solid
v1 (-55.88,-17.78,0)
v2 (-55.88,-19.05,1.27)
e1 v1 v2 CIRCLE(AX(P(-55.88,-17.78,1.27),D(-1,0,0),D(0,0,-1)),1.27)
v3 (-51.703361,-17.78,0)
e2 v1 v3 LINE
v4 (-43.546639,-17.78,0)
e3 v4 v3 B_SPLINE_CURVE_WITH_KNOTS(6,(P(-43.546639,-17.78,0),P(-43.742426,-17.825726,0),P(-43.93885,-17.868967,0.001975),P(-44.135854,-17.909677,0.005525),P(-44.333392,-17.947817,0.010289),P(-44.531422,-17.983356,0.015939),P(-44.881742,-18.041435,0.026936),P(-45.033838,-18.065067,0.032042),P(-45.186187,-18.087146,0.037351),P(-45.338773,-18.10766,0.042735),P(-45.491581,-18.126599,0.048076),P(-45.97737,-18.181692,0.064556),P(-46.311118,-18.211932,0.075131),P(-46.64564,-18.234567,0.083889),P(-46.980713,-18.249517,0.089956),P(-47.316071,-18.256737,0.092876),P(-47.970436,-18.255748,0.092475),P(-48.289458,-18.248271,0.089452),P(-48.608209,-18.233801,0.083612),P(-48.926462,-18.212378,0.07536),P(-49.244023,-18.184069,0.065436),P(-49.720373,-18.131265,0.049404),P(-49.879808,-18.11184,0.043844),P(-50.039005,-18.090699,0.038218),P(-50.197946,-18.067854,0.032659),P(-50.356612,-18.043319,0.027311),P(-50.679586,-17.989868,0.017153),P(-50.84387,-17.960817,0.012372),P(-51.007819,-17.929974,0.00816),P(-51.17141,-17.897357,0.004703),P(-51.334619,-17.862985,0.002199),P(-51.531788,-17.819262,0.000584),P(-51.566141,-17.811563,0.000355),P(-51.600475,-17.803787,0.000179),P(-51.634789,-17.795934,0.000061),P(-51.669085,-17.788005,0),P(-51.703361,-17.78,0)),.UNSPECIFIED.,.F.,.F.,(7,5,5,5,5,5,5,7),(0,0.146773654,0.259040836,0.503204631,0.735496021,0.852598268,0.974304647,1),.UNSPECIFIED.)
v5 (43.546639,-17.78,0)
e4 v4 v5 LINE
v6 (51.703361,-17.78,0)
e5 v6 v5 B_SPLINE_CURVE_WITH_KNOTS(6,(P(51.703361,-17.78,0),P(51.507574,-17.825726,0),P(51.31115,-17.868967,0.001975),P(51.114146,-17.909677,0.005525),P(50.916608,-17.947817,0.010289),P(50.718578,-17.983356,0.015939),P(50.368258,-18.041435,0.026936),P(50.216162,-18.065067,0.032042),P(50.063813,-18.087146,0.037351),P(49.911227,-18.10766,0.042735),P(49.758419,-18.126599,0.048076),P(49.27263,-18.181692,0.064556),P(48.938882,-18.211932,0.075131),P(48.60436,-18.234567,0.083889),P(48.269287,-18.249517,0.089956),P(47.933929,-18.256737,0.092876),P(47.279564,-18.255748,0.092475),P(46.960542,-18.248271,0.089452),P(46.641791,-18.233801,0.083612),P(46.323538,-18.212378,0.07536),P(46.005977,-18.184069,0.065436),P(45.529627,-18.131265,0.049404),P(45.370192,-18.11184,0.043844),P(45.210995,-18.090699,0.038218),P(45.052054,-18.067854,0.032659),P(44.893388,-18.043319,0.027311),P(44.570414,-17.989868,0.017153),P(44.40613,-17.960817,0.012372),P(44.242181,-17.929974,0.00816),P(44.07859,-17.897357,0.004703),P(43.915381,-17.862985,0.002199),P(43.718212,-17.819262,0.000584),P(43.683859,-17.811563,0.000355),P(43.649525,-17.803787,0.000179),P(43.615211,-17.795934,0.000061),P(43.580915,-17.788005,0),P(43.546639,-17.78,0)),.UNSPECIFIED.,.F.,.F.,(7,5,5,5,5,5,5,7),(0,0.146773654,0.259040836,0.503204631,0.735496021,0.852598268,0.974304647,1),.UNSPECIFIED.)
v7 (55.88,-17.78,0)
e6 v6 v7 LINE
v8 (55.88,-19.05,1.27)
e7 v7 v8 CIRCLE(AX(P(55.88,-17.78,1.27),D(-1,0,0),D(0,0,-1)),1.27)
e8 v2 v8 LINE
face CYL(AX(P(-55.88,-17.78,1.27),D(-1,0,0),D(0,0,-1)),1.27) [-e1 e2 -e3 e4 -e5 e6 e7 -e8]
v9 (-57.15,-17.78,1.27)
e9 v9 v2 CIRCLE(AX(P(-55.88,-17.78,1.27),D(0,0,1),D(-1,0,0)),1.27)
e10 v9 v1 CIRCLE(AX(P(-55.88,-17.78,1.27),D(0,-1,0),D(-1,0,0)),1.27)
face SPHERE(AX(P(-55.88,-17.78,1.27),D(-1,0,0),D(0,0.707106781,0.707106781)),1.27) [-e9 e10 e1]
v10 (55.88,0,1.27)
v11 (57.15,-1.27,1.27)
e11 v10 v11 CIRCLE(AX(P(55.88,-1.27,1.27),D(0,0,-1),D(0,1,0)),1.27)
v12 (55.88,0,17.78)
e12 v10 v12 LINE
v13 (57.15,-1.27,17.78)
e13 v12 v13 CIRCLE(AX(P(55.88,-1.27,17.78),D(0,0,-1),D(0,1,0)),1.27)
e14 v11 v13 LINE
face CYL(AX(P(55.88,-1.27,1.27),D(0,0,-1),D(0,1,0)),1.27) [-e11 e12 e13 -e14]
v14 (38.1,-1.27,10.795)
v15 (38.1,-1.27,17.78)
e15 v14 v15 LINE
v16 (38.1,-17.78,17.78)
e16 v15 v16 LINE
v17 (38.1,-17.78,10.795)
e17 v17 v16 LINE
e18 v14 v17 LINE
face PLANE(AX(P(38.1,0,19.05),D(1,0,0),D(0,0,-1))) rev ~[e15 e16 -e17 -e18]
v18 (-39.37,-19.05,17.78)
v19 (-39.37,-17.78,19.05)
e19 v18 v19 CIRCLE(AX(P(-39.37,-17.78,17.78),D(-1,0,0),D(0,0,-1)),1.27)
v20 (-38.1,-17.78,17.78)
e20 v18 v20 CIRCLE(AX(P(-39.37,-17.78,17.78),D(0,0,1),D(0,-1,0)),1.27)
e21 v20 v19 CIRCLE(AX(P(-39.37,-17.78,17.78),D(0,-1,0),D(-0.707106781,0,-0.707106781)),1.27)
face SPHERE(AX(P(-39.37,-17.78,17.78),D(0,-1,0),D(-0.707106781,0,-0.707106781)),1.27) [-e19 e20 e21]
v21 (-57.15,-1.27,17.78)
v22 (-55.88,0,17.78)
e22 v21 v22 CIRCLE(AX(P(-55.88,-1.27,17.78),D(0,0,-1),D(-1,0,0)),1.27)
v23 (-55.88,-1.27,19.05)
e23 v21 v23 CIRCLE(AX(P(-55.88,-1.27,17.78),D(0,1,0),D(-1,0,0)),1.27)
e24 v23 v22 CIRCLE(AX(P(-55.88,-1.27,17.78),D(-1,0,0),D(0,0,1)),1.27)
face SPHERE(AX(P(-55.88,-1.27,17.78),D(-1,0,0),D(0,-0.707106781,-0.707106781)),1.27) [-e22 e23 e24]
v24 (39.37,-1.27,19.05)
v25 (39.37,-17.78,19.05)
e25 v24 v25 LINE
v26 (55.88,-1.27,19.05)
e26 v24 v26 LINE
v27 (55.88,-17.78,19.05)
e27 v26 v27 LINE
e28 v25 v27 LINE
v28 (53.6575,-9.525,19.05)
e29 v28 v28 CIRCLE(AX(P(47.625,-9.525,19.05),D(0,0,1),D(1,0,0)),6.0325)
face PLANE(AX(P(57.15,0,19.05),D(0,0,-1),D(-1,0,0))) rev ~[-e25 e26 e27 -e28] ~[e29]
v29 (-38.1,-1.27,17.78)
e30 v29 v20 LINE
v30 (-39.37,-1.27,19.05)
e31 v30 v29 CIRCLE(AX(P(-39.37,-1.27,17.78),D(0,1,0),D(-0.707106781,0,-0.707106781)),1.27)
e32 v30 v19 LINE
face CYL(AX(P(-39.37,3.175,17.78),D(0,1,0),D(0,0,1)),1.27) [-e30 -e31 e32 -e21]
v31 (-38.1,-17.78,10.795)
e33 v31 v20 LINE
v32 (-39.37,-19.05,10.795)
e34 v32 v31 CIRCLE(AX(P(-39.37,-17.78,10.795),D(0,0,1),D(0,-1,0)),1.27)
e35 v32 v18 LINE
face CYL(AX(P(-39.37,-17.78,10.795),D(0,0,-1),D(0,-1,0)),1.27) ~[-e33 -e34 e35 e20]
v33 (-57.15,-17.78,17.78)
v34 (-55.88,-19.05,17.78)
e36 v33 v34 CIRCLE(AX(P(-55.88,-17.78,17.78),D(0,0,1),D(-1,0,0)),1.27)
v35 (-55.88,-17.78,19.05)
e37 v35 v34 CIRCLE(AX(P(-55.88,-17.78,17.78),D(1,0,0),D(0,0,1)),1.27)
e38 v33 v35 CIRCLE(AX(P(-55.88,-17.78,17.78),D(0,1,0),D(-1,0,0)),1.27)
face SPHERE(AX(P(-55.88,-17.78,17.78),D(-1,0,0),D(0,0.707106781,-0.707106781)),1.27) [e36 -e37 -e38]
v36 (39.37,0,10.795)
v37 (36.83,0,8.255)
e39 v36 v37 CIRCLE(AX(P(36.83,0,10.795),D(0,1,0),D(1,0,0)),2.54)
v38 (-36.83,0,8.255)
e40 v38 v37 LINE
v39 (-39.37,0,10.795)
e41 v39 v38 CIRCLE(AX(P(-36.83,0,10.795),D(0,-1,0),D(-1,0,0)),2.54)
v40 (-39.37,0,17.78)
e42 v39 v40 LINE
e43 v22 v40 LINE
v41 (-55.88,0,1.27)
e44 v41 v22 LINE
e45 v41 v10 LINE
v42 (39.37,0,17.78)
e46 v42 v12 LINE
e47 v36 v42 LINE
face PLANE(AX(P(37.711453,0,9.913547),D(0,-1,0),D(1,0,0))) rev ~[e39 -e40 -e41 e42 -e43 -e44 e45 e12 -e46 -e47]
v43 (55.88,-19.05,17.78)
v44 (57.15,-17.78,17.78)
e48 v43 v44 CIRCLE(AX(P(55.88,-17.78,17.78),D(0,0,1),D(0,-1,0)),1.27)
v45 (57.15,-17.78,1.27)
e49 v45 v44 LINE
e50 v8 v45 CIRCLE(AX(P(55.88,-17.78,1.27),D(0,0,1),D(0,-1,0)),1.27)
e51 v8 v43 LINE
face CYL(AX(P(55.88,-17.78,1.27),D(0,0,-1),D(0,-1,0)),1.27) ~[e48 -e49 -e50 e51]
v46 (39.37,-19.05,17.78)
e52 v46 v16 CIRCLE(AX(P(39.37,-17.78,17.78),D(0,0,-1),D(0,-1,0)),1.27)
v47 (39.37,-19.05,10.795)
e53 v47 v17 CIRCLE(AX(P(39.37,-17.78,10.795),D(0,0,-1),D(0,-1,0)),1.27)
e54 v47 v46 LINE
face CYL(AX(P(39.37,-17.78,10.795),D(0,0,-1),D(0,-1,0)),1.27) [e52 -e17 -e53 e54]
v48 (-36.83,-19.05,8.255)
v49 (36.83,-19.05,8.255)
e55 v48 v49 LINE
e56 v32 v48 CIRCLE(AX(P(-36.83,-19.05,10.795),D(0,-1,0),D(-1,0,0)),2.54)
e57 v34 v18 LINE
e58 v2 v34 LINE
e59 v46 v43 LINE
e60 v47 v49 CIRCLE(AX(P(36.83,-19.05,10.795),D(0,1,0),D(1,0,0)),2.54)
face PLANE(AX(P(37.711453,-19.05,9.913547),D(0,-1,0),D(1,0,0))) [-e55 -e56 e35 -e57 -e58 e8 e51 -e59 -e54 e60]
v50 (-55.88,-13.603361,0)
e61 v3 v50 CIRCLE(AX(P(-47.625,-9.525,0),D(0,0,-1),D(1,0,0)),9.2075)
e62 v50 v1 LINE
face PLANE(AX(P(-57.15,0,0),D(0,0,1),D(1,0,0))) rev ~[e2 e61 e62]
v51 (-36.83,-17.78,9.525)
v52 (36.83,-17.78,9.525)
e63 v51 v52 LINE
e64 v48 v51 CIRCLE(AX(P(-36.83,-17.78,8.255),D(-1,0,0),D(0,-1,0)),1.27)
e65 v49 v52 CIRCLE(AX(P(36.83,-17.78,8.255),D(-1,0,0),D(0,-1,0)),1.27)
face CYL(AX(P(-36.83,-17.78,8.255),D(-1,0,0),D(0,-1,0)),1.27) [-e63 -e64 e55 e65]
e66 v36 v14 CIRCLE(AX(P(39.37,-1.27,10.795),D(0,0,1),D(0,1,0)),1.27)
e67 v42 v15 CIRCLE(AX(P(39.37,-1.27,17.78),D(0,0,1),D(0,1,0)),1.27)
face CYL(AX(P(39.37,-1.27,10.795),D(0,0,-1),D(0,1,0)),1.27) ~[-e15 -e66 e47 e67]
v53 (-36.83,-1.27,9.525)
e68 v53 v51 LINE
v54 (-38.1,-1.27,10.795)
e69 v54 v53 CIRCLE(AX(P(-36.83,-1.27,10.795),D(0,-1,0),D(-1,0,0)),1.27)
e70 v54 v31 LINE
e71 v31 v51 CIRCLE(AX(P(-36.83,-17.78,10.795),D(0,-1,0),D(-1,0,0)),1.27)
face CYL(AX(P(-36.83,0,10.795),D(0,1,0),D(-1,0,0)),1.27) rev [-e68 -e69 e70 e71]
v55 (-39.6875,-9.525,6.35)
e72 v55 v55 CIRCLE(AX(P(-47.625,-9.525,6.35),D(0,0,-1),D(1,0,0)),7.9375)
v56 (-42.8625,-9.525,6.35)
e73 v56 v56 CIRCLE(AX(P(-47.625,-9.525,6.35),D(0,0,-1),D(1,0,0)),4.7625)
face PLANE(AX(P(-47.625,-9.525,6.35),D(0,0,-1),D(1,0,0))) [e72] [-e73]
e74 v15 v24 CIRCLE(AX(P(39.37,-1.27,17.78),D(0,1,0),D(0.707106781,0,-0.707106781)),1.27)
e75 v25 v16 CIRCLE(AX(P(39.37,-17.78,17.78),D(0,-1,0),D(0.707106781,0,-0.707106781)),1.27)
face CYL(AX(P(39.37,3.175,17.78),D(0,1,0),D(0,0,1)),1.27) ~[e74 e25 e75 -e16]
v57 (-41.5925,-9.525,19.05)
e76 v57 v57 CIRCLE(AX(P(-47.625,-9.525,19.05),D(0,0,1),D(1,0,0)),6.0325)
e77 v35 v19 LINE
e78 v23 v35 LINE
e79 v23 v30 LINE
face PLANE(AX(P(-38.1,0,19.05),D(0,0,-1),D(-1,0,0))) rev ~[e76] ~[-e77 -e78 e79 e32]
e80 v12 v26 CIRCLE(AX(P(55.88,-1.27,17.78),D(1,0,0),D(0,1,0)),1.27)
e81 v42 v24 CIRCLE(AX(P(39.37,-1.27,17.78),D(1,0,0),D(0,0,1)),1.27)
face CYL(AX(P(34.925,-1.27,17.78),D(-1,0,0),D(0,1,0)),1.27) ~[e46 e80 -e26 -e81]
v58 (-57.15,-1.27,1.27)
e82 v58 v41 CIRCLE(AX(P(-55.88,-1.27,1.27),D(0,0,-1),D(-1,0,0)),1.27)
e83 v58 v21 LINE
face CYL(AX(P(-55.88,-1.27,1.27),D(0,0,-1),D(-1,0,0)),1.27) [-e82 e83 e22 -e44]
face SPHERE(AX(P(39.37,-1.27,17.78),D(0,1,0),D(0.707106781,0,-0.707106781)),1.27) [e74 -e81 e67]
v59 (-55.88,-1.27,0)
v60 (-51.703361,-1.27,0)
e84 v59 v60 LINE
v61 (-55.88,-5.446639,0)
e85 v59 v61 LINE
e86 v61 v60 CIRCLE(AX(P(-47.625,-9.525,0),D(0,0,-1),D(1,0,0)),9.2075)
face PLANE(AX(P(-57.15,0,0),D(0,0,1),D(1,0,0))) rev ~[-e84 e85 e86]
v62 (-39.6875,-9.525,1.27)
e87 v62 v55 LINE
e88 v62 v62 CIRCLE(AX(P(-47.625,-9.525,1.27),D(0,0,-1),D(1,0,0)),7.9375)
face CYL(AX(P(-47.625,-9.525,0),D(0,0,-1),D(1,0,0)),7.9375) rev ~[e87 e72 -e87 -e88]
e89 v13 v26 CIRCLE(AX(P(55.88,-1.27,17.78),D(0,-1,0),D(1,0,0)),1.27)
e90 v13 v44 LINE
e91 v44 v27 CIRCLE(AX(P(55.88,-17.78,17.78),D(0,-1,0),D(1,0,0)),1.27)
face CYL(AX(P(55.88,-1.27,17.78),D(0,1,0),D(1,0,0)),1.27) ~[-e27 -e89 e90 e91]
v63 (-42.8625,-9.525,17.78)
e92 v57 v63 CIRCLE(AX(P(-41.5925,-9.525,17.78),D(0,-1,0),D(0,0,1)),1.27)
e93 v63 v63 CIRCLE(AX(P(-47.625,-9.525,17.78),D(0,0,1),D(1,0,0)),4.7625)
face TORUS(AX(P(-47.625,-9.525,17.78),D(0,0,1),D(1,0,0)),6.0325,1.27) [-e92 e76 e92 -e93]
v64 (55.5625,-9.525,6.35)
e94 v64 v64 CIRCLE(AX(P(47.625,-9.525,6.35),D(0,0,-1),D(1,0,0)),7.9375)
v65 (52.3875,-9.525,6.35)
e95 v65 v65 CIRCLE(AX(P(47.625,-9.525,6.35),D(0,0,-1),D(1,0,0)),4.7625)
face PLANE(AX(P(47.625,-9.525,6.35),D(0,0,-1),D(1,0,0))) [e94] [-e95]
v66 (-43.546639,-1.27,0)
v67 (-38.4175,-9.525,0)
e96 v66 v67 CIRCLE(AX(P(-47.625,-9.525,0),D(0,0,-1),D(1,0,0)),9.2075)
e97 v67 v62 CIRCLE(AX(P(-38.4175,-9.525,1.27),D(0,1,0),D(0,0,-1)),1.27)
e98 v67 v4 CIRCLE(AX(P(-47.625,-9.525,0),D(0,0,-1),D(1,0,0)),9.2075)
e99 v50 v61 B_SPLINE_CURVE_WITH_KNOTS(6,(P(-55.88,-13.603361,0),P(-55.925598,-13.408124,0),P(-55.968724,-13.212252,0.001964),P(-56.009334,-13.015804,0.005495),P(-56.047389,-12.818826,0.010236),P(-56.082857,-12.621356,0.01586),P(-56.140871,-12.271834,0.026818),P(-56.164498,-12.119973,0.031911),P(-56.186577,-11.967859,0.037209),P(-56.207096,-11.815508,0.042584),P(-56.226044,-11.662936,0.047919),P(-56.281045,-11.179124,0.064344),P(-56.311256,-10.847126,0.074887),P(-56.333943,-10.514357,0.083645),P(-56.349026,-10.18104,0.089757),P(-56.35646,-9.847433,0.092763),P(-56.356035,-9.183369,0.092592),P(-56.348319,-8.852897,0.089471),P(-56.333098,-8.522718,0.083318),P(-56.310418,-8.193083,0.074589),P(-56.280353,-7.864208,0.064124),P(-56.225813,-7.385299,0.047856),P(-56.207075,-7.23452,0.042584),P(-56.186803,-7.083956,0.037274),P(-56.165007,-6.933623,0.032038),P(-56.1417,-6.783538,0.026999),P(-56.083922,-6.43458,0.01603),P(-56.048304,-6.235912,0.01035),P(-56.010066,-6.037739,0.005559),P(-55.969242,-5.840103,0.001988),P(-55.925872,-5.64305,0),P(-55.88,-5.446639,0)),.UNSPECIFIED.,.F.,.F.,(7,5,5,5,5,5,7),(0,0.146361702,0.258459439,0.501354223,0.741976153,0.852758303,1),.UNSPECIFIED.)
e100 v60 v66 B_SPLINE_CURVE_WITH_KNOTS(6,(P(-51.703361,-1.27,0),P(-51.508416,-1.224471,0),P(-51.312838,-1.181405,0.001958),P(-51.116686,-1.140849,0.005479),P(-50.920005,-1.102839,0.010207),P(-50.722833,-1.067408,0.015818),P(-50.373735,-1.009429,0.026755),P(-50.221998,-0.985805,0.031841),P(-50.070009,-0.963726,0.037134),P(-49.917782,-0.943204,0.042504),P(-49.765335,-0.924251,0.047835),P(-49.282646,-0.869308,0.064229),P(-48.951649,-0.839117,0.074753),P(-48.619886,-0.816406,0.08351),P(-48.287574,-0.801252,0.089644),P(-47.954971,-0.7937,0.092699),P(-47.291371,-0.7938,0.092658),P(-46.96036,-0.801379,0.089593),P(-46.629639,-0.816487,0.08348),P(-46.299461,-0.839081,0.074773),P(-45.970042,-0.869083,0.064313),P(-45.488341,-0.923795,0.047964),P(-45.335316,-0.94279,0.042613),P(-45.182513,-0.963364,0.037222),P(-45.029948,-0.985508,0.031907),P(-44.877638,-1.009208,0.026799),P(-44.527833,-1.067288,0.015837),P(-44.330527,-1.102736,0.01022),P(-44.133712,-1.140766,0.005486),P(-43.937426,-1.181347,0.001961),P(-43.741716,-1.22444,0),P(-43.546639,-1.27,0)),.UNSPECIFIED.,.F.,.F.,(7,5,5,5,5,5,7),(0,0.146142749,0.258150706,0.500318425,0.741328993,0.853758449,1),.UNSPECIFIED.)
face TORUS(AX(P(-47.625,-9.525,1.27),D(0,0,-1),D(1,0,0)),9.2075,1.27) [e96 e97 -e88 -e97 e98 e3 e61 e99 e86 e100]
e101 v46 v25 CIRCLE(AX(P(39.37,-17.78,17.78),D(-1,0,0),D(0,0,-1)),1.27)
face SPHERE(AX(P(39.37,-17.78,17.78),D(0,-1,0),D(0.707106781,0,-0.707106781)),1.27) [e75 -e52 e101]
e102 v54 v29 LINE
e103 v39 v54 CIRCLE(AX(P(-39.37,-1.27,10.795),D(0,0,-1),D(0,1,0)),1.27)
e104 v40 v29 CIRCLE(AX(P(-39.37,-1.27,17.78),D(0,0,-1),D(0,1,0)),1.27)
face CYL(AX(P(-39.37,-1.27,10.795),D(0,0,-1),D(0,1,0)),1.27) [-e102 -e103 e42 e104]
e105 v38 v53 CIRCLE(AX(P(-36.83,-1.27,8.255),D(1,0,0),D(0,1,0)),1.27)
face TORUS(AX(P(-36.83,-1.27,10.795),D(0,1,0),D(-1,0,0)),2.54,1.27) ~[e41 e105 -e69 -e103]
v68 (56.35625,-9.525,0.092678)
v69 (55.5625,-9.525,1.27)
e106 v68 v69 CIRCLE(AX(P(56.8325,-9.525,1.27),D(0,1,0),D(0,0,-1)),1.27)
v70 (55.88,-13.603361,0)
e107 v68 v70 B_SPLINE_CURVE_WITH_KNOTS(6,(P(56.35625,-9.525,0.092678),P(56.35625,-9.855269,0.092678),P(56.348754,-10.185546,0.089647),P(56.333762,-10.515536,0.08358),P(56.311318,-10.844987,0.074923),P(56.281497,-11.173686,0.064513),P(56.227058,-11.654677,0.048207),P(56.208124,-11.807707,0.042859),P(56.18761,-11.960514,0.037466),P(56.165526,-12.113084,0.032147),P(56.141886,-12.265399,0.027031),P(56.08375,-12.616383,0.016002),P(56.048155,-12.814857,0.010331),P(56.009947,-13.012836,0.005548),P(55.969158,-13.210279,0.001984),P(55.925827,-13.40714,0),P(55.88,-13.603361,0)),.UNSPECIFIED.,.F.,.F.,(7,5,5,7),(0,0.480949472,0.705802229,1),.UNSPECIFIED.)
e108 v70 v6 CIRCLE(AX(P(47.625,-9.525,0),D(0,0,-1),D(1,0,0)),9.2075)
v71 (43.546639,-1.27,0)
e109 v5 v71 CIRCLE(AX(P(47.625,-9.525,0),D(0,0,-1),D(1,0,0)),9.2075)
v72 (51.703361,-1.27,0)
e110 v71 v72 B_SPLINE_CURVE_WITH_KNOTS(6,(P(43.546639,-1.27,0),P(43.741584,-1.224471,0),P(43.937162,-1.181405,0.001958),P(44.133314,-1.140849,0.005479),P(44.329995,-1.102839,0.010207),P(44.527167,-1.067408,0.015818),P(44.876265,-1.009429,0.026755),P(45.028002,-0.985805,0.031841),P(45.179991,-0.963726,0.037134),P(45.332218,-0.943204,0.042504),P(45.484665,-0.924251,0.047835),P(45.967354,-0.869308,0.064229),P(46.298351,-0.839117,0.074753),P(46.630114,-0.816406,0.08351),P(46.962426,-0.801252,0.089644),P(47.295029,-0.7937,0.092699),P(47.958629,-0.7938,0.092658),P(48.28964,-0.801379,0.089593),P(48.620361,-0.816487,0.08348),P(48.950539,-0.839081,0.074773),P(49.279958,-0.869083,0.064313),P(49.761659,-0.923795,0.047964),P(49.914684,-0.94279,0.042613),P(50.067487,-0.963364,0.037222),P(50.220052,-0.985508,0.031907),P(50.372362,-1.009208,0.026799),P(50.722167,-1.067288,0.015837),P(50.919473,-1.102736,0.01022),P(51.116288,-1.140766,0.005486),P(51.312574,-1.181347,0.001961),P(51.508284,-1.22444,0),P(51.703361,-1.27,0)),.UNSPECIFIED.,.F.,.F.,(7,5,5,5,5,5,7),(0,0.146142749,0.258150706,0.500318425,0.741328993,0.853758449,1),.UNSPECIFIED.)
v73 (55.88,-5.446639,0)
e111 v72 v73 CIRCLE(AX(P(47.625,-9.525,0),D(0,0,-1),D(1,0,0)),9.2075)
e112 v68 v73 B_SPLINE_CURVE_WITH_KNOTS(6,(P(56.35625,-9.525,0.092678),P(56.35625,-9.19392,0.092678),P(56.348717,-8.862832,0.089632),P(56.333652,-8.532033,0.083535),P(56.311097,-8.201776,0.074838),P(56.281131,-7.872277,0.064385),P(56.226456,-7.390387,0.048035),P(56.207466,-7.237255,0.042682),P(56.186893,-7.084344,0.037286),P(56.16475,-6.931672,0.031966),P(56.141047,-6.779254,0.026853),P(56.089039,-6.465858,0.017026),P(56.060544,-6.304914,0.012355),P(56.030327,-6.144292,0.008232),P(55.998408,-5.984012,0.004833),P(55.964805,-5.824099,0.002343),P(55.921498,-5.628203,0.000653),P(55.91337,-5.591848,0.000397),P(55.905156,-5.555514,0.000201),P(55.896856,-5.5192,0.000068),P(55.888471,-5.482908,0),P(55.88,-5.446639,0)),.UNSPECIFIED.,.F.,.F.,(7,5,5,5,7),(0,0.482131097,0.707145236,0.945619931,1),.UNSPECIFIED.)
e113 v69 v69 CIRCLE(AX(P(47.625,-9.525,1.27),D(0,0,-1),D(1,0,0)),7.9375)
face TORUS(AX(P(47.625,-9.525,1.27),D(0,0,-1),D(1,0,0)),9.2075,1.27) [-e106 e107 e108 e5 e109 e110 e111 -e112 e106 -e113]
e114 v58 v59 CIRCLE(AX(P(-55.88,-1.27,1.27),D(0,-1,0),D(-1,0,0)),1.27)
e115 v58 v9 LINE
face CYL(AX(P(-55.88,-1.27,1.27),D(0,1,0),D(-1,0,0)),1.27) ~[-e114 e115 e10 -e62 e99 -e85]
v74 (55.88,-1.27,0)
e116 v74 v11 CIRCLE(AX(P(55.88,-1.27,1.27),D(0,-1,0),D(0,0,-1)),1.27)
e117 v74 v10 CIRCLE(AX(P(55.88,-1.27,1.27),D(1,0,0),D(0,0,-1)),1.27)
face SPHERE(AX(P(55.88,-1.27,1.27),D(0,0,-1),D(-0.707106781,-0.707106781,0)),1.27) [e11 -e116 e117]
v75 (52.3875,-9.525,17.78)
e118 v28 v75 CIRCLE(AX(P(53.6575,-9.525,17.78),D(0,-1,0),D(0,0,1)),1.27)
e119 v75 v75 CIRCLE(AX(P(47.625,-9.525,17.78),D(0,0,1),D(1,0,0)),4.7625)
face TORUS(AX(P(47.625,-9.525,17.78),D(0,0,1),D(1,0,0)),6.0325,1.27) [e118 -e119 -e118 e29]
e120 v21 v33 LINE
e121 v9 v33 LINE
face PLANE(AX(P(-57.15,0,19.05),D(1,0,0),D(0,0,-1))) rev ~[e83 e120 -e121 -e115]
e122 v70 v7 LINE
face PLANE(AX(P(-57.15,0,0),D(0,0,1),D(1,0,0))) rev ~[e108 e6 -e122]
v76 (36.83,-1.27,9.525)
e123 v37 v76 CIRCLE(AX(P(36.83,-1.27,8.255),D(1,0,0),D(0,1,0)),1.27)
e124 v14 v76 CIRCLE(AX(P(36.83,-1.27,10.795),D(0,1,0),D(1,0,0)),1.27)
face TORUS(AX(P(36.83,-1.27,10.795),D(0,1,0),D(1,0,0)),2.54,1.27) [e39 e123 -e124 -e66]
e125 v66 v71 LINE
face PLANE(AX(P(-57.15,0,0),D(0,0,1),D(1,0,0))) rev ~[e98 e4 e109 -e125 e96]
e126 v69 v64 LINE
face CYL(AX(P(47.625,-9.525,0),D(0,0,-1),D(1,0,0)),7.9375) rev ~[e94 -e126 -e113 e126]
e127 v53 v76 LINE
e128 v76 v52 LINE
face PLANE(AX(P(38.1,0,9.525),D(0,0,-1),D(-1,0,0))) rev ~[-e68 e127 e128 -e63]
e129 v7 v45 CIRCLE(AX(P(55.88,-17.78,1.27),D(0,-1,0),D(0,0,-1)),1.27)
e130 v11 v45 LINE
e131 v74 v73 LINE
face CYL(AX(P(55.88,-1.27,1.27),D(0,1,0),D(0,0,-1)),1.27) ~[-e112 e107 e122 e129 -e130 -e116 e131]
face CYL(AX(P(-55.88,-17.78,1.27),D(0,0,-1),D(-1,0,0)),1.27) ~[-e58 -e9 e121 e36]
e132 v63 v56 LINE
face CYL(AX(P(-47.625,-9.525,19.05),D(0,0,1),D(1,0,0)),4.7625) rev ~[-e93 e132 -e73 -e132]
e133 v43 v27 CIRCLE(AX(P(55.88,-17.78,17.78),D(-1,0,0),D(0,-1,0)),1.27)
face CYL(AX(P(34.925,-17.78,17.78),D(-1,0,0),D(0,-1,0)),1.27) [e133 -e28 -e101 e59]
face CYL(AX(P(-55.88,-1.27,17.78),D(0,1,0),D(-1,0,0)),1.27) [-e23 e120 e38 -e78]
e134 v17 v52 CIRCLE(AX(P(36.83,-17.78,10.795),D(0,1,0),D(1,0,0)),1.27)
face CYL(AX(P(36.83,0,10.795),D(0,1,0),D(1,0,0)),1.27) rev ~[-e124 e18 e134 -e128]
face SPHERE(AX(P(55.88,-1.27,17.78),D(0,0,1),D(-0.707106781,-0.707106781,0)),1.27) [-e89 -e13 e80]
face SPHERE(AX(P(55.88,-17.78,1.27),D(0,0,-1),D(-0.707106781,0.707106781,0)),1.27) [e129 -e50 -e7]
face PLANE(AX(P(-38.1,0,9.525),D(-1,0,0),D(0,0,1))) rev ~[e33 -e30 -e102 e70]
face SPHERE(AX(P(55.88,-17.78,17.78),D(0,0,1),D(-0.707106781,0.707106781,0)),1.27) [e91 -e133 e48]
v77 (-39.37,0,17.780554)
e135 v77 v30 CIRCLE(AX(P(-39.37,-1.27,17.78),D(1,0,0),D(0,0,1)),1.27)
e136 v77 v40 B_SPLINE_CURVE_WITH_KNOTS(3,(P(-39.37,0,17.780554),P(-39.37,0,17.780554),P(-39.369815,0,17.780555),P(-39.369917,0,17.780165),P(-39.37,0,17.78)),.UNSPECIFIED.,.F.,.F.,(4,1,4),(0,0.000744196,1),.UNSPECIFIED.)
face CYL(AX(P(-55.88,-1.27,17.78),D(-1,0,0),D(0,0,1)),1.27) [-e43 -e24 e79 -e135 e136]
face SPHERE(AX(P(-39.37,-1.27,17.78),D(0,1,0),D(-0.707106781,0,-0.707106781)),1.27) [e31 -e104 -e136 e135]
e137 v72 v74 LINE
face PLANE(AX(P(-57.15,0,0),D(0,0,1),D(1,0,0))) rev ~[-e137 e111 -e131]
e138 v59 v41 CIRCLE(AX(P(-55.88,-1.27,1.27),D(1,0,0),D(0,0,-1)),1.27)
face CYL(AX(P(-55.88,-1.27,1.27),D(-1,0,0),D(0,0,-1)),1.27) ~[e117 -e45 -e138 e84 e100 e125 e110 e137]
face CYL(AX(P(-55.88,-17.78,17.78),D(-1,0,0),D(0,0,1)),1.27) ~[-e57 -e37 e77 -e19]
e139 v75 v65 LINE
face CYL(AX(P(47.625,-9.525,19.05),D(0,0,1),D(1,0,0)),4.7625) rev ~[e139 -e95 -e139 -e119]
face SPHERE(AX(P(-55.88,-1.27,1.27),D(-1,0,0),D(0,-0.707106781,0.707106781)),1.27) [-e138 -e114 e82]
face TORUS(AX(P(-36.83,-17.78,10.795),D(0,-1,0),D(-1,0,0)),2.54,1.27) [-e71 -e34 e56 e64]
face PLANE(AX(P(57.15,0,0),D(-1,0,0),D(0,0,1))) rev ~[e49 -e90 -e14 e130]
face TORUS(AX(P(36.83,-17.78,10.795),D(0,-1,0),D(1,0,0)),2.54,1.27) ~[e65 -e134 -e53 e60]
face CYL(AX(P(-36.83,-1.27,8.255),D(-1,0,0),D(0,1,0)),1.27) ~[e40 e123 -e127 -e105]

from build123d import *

# Parameters (mm, degrees)
F1_DEPTH      = 19.05
F2_R          = 4.7625
F3_DEPTH      = 19.051
F4_R          = 7.9375
F4_R_2        = 4.7625
F5_DEPTH      = 6.35
F6_T1_DEPTH   = 19.05
F6_T3_DEPTH   = 16.51
F6_T5_DEPTH   = 111.76
F6_T7_DEPTH   = 20.955
F6_T9_DEPTH   = 20.955
F6_T11_DEPTH  = 16.51
F6_T13_DEPTH  = 25.4
F6_S17_W      = 1.27
F6_S17_H      = 1.27
F6_T18_DEPTH  = 1.27
F6_S23_W      = 1.27
F6_S23_H      = 1.27
F6_T24_DEPTH  = 1.27
F6_S29_W      = 1.27
F6_S29_H      = 1.27
F6_T30_DEPTH  = 1.27
F6_S35_W      = 1.27
F6_S35_H      = 1.27
F6_T36_DEPTH  = 1.27
F6_S41_W      = 1.27
F6_S41_H      = 1.27
F6_T42_DEPTH  = 1.27
F6_S47_W      = 1.27
F6_S47_H      = 1.27
F6_T48_DEPTH  = 1.27
F6_S53_W      = 1.27
F6_S53_H      = 1.27
F6_T54_DEPTH  = 1.27
F6_S59_W      = 1.27
F6_S59_H      = 1.27
F6_T60_DEPTH  = 1.27
F6_T71_DEPTH  = 6.985
F6_T73_DEPTH  = 73.66
F6_S77_W      = 1.27
F6_S77_H      = 1.27
F6_T78_DEPTH  = 1.27
F6_S83_W      = 1.27
F6_S83_H      = 1.27
F6_T84_DEPTH  = 1.27
F6_S89_W      = 1.27
F6_S89_H      = 1.27
F6_T90_DEPTH  = 1.27
F6_S95_W      = 1.27
F6_S95_H      = 1.27
F6_T96_DEPTH  = 1.27
F6_T100_ANGLE = 90
F6_T102_ANGLE = 90
F6_T104_ANGLE = 90
F6_T106_ANGLE = 90


# Not quite as in the source:
# - a fillet or chamfer that OpenCascade refuses, or shapes differently, is made with other operations: its cross-section is extruded or revolved along the edge and cut away or added


with BuildPart() as f1:
    # F0 (on Front) → F1 (new body)
    with BuildSketch(Plane.XZ):
        Polygon((-57.15, 19.05), (-57.15, 0), (0, 0), (57.15, 0), (57.15, 19.05), (38.1, 19.05), (38.1, 9.525), (-38.1, 9.525), (-38.1, 19.05), align=None)
    extrude(amount=F1_DEPTH)

    # F2 (on face) → F3 (cut, through all)
    with BuildSketch(Plane.XY.offset(19.05)):
        with Locations((-47.625, -9.525)):
            Circle(F2_R)
        with Locations((47.625, -9.525)):
            Circle(F2_R)
    extrude(amount=-F3_DEPTH, mode=Mode.SUBTRACT)

    # F4 (on face) → F5 (cut)
    with BuildSketch(Plane(origin=(0, 0, 0), x_dir=(1, 0, 0), z_dir=(0, 0, -1))):
        with Locations((-47.625, 9.525)):
            Circle(F4_R)
        with Locations((-47.625, 9.525)):
            Circle(F4_R_2, mode=Mode.SUBTRACT)
        with Locations((47.625, 9.525)):
            Circle(F4_R)
        with Locations((47.625, 9.525)):
            Circle(F4_R_2, mode=Mode.SUBTRACT)
    extrude(amount=-F5_DEPTH, mode=Mode.SUBTRACT)

    # F6: fillet of radius 1.27 on 28 edges, made by hand

    # F6_s2 → F6_t1 (join)
    with BuildSketch(Plane.XZ):
        with BuildLine():
            ThreePointArc((38.1, 10.795), (37.7280256121, 9.8969743879), (36.83, 9.525))
            Line((36.83, 9.525), (38.1, 9.525))
            Line((38.1, 9.525), (38.1, 10.795))
        make_face()
        with BuildLine():
            ThreePointArc((-38.1, 10.795), (-37.7280256121, 9.8969743879), (-36.83, 9.525))
            Line((-36.83, 9.525), (-38.1, 9.525))
            Line((-38.1, 9.525), (-38.1, 10.795))
        make_face()
    extrude(amount=F6_T1_DEPTH)

    # F6_s4 → F6_t3 (cut)
    with BuildSketch(Plane.XY.offset(1.27)):
        with BuildLine():
            ThreePointArc((-57.15, -17.78), (-56.7780256121, -18.6780256121), (-55.88, -19.05))
            Line((-55.88, -19.05), (-57.15, -19.05))
            Line((-57.15, -19.05), (-57.15, -17.78))
        make_face()
        with BuildLine():
            ThreePointArc((55.88, -19.05), (56.7780256121, -18.6780256121), (57.15, -17.78))
            Line((57.15, -17.78), (57.15, -19.05))
            Line((57.15, -19.05), (55.88, -19.05))
        make_face()
        with BuildLine():
            ThreePointArc((-57.15, -1.27), (-56.7780256121, -0.3719743879), (-55.88, 0))
            Line((-55.88, 0), (-57.15, 0))
            Line((-57.15, 0), (-57.15, -1.27))
        make_face()
        with BuildLine():
            ThreePointArc((55.88, 0), (56.7780256121, -0.3719743879), (57.15, -1.27))
            Line((57.15, -1.27), (57.15, 0))
            Line((57.15, 0), (55.88, 0))
        make_face()
    extrude(amount=F6_T3_DEPTH, mode=Mode.SUBTRACT)

    # F6_s6 → F6_t5 (cut)
    with BuildSketch(Plane.YZ.offset(-55.88)):
        with BuildLine():
            ThreePointArc((-17.78, 0), (-18.6780256121, 0.3719743879), (-19.05, 1.27))
            Line((-19.05, 1.27), (-19.05, 0))
            Line((-19.05, 0), (-17.78, 0))
        make_face()
        with BuildLine():
            ThreePointArc((-1.27, 0), (-0.3719743879, 0.3719743879), (0, 1.27))
            Line((0, 1.27), (0, 0))
            Line((0, 0), (-1.27, 0))
        make_face()
    extrude(amount=F6_T5_DEPTH, mode=Mode.SUBTRACT)

    # F6_s8 → F6_t7 (cut)
    with BuildSketch(Plane.YZ.offset(34.925)):
        with BuildLine():
            ThreePointArc((-19.05, 17.78), (-18.6780256121, 18.6780256121), (-17.78, 19.05))
            Line((-17.78, 19.05), (-19.05, 19.05))
            Line((-19.05, 19.05), (-19.05, 17.78))
        make_face()
        with BuildLine():
            ThreePointArc((0, 17.78), (-0.3719743879, 18.6780256121), (-1.27, 19.05))
            Line((-1.27, 19.05), (0, 19.05))
            Line((0, 19.05), (0, 17.78))
        make_face()
    extrude(amount=F6_T7_DEPTH, mode=Mode.SUBTRACT)

    # F6_s10 → F6_t9 (cut)
    with BuildSketch(Plane.YZ.offset(-55.88)):
        with BuildLine():
            ThreePointArc((-17.78, 19.05), (-18.6780256121, 18.6780256121), (-19.05, 17.78))
            Line((-19.05, 17.78), (-19.05, 19.05))
            Line((-19.05, 19.05), (-17.78, 19.05))
        make_face()
        with BuildLine():
            ThreePointArc((-1.27, 19.05), (-0.3719743879, 18.6780256121), (0, 17.78))
            Line((0, 17.78), (0, 19.05))
            Line((0, 19.05), (-1.27, 19.05))
        make_face()
    extrude(amount=F6_T9_DEPTH, mode=Mode.SUBTRACT)

    # F6_s12 → F6_t11 (cut)
    with BuildSketch(Plane.XZ.offset(1.27)):
        with BuildLine():
            ThreePointArc((57.15, 17.78), (56.7780256121, 18.6780256121), (55.88, 19.05))
            Line((55.88, 19.05), (57.15, 19.05))
            Line((57.15, 19.05), (57.15, 17.78))
        make_face()
        with BuildLine():
            ThreePointArc((-57.15, 17.78), (-56.7780256121, 18.6780256121), (-55.88, 19.05))
            Line((-55.88, 19.05), (-57.15, 19.05))
            Line((-57.15, 19.05), (-57.15, 17.78))
        make_face()
        with BuildLine():
            ThreePointArc((-57.15, 1.27), (-56.7780256121, 0.3719743879), (-55.88, 0))
            Line((-55.88, 0), (-57.15, 0))
            Line((-57.15, 0), (-57.15, 1.27))
        make_face()
        with BuildLine():
            ThreePointArc((55.88, 0), (56.7780256121, 0.3719743879), (57.15, 1.27))
            Line((57.15, 1.27), (57.15, 0))
            Line((57.15, 0), (55.88, 0))
        make_face()
    extrude(amount=F6_T11_DEPTH, mode=Mode.SUBTRACT)

    # F6_s14 → F6_t13 (cut)
    with BuildSketch(Plane.XZ.offset(-3.175)):
        with BuildLine():
            ThreePointArc((39.37, 19.05), (38.4719743879, 18.6780256121), (38.1, 17.78))
            Line((38.1, 17.78), (38.1, 19.05))
            Line((38.1, 19.05), (39.37, 19.05))
        make_face()
        with BuildLine():
            ThreePointArc((-39.37, 19.05), (-38.4719743879, 18.6780256121), (-38.1, 17.78))
            Line((-38.1, 17.78), (-38.1, 19.05))
            Line((-38.1, 19.05), (-39.37, 19.05))
        make_face()
    extrude(amount=F6_T13_DEPTH, mode=Mode.SUBTRACT)


with BuildPart() as f6_tool16:
    # F6_s17 → F6_t18 (new body)
    with BuildSketch(Plane.YZ.offset(-55.88)):
        with Locations((-18.415, 18.415)):
            Rectangle(F6_S17_W, F6_S17_H)
    extrude(amount=-F6_T18_DEPTH)

    # F6_s19 → F6_t20 (revolve, cut)
    with BuildSketch(Plane(origin=(-55.88, -17.78, 17.78), x_dir=(0, 0.7071067812, -0.7071067812), z_dir=(0, 0.7071067812, 0.7071067812))):
        with BuildLine():
            ThreePointArc((0, -1.27), (1.27, 0), (0, 1.27))
            Line((0, 1.27), (0, -1.27))
        make_face()
    revolve(axis=Axis((-55.88, -17.78, 17.78), (-1, 0, 0)), mode=Mode.SUBTRACT)


with BuildPart() as f1_1:
    add(f1.part)

    # F6_t15: cut F6_tool16
    add(f6_tool16.part, mode=Mode.SUBTRACT)


with BuildPart() as f6_tool22:
    # F6_s23 → F6_t24 (new body)
    with BuildSketch(Plane.YZ.offset(-55.88)):
        with Locations((-18.415, 0.635)):
            Rectangle(F6_S23_W, F6_S23_H)
    extrude(amount=-F6_T24_DEPTH)

    # F6_s25 → F6_t26 (revolve, cut)
    with BuildSketch(Plane(origin=(-55.88, -17.78, 1.27), x_dir=(0, 0.7071067812, 0.7071067812), z_dir=(0, -0.7071067812, 0.7071067812))):
        with BuildLine():
            ThreePointArc((0, -1.27), (1.27, 0), (0, 1.27))
            Line((0, 1.27), (0, -1.27))
        make_face()
    revolve(axis=Axis((-55.88, -17.78, 1.27), (-1, 0, 0)), mode=Mode.SUBTRACT)


with BuildPart() as f1_2:
    add(f1_1.part)

    # F6_t21: cut F6_tool22
    add(f6_tool22.part, mode=Mode.SUBTRACT)


with BuildPart() as f6_tool28:
    # F6_s29 → F6_t30 (new body)
    with BuildSketch(Plane.XY.offset(1.27)):
        with Locations((56.515, -18.415)):
            Rectangle(F6_S29_W, F6_S29_H)
    extrude(amount=-F6_T30_DEPTH)

    # F6_s31 → F6_t32 (revolve, cut)
    with BuildSketch(Plane(origin=(55.88, -17.78, 1.27), x_dir=(-0.7071067812, 0.7071067812, 0), z_dir=(-0.7071067812, -0.7071067812, 0))):
        with BuildLine():
            ThreePointArc((0, -1.27), (1.27, 0), (0, 1.27))
            Line((0, 1.27), (0, -1.27))
        make_face()
    revolve(axis=Axis((55.88, -17.78, 1.27), (0, 0, -1)), mode=Mode.SUBTRACT)


with BuildPart() as f1_3:
    add(f1_2.part)

    # F6_t27: cut F6_tool28
    add(f6_tool28.part, mode=Mode.SUBTRACT)


with BuildPart() as f6_tool34:
    # F6_s35 → F6_t36 (new body)
    with BuildSketch(Plane.XY.offset(17.78)):
        with Locations((56.515, -18.415)):
            Rectangle(F6_S35_W, F6_S35_H)
    extrude(amount=F6_T36_DEPTH)

    # F6_s37 → F6_t38 (revolve, cut)
    with BuildSketch(Plane(origin=(55.88, -17.78, 17.78), x_dir=(-0.7071067812, 0.7071067812, 0), z_dir=(0.7071067812, 0.7071067812, 0))):
        with BuildLine():
            ThreePointArc((0, -1.27), (1.27, 0), (0, 1.27))
            Line((0, 1.27), (0, -1.27))
        make_face()
    revolve(axis=Axis((55.88, -17.78, 17.78), (0, 0, 1)), mode=Mode.SUBTRACT)


with BuildPart() as f1_4:
    add(f1_3.part)

    # F6_t33: cut F6_tool34
    add(f6_tool34.part, mode=Mode.SUBTRACT)


with BuildPart() as f6_tool40:
    # F6_s41 → F6_t42 (new body)
    with BuildSketch(Plane.YZ.offset(-55.88)):
        with Locations((-0.635, 18.415)):
            Rectangle(F6_S41_W, F6_S41_H)
    extrude(amount=-F6_T42_DEPTH)

    # F6_s43 → F6_t44 (revolve, cut)
    with BuildSketch(Plane(origin=(-55.88, -1.27, 17.78), x_dir=(0, -0.7071067812, -0.7071067812), z_dir=(0, 0.7071067812, -0.7071067812))):
        with BuildLine():
            ThreePointArc((0, -1.27), (1.27, 0), (0, 1.27))
            Line((0, 1.27), (0, -1.27))
        make_face()
    revolve(axis=Axis((-55.88, -1.27, 17.78), (-1, 0, 0)), mode=Mode.SUBTRACT)


with BuildPart() as f1_5:
    add(f1_4.part)

    # F6_t39: cut F6_tool40
    add(f6_tool40.part, mode=Mode.SUBTRACT)


with BuildPart() as f6_tool46:
    # F6_s47 → F6_t48 (new body)
    with BuildSketch(Plane.YZ.offset(-55.88)):
        with Locations((-0.635, 0.635)):
            Rectangle(F6_S47_W, F6_S47_H)
    extrude(amount=-F6_T48_DEPTH)

    # F6_s49 → F6_t50 (revolve, cut)
    with BuildSketch(Plane(origin=(-55.88, -1.27, 1.27), x_dir=(0, -0.7071067812, 0.7071067812), z_dir=(0, -0.7071067812, -0.7071067812))):
        with BuildLine():
            ThreePointArc((0, -1.27), (1.27, 0), (0, 1.27))
            Line((0, 1.27), (0, -1.27))
        make_face()
    revolve(axis=Axis((-55.88, -1.27, 1.27), (-1, 0, 0)), mode=Mode.SUBTRACT)


with BuildPart() as f1_6:
    add(f1_5.part)

    # F6_t45: cut F6_tool46
    add(f6_tool46.part, mode=Mode.SUBTRACT)


with BuildPart() as f6_tool52:
    # F6_s53 → F6_t54 (new body)
    with BuildSketch(Plane.XY.offset(1.27)):
        with Locations((56.515, -0.635)):
            Rectangle(F6_S53_W, F6_S53_H)
    extrude(amount=-F6_T54_DEPTH)

    # F6_s55 → F6_t56 (revolve, cut)
    with BuildSketch(Plane(origin=(55.88, -1.27, 1.27), x_dir=(-0.7071067812, -0.7071067812, 0), z_dir=(0.7071067812, -0.7071067812, 0))):
        with BuildLine():
            ThreePointArc((0, -1.27), (1.27, 0), (0, 1.27))
            Line((0, 1.27), (0, -1.27))
        make_face()
    revolve(axis=Axis((55.88, -1.27, 1.27), (0, 0, -1)), mode=Mode.SUBTRACT)


with BuildPart() as f1_7:
    add(f1_6.part)

    # F6_t51: cut F6_tool52
    add(f6_tool52.part, mode=Mode.SUBTRACT)


with BuildPart() as f6_tool58:
    # F6_s59 → F6_t60 (new body)
    with BuildSketch(Plane.XY.offset(17.78)):
        with Locations((56.515, -0.635)):
            Rectangle(F6_S59_W, F6_S59_H)
    extrude(amount=F6_T60_DEPTH)

    # F6_s61 → F6_t62 (revolve, cut)
    with BuildSketch(Plane(origin=(55.88, -1.27, 17.78), x_dir=(-0.7071067812, -0.7071067812, 0), z_dir=(-0.7071067812, 0.7071067812, 0))):
        with BuildLine():
            ThreePointArc((0, -1.27), (1.27, 0), (0, 1.27))
            Line((0, 1.27), (0, -1.27))
        make_face()
    revolve(axis=Axis((55.88, -1.27, 17.78), (0, 0, 1)), mode=Mode.SUBTRACT)


with BuildPart() as f1_8:
    add(f1_7.part)

    # F6_t57: cut F6_tool58
    add(f6_tool58.part, mode=Mode.SUBTRACT)

    # F6_s63 → F6_t64 (revolve, cut)
    with BuildSketch(Plane.XZ.offset(9.525)):
        with BuildLine():
            ThreePointArc((53.6575, 19.05), (52.7594743879, 18.6780256121), (52.3875, 17.78))
            Line((52.3875, 17.78), (52.3875, 19.05))
            Line((52.3875, 19.05), (53.6575, 19.05))
        make_face()
    revolve(axis=Axis((47.625, -9.525, 19.05), (0, 0, 1)), mode=Mode.SUBTRACT)

    # F6_s65 → F6_t66 (revolve, cut)
    with BuildSketch(Plane.XZ.offset(9.525)):
        with BuildLine():
            ThreePointArc((-41.5925, 19.05), (-42.4905256121, 18.6780256121), (-42.8625, 17.78))
            Line((-42.8625, 17.78), (-42.8625, 19.05))
            Line((-42.8625, 19.05), (-41.5925, 19.05))
        make_face()
    revolve(axis=Axis((-47.625, -9.525, 19.05), (0, 0, 1)), mode=Mode.SUBTRACT)

    # F6_s67 → F6_t68 (revolve, cut)
    with BuildSketch(Plane.XZ.offset(9.525)):
        with BuildLine():
            ThreePointArc((-38.4175, 0), (-39.3155256121, 0.3719743879), (-39.6875, 1.27))
            Line((-39.6875, 1.27), (-39.6875, 0))
            Line((-39.6875, 0), (-38.4175, 0))
        make_face()
    revolve(axis=Axis((-47.625, -9.525, 0), (0, 0, -1)), mode=Mode.SUBTRACT)

    # F6_s69 → F6_t70 (revolve, cut)
    with BuildSketch(Plane.XZ.offset(9.525)):
        with BuildLine():
            ThreePointArc((56.8325, 0), (55.9344743879, 0.3719743879), (55.5625, 1.27))
            Line((55.5625, 1.27), (55.5625, 0))
            Line((55.5625, 0), (56.8325, 0))
        make_face()
    revolve(axis=Axis((47.625, -9.525, 0), (0, 0, -1)), mode=Mode.SUBTRACT)

    # F6_s72 → F6_t71 (cut)
    with BuildSketch(Plane.XY.offset(10.795)):
        with BuildLine():
            ThreePointArc((39.37, -19.05), (38.4719743879, -18.6780256121), (38.1, -17.78))
            Line((38.1, -17.78), (38.1, -19.05))
            Line((38.1, -19.05), (39.37, -19.05))
        make_face()
        with BuildLine():
            ThreePointArc((-39.37, -19.05), (-38.4719743879, -18.6780256121), (-38.1, -17.78))
            Line((-38.1, -17.78), (-38.1, -19.05))
            Line((-38.1, -19.05), (-39.37, -19.05))
        make_face()
        with BuildLine():
            ThreePointArc((39.37, 0), (38.4719743879, -0.3719743879), (38.1, -1.27))
            Line((38.1, -1.27), (38.1, 0))
            Line((38.1, 0), (39.37, 0))
        make_face()
        with BuildLine():
            ThreePointArc((-39.37, 0), (-38.4719743879, -0.3719743879), (-38.1, -1.27))
            Line((-38.1, -1.27), (-38.1, 0))
            Line((-38.1, 0), (-39.37, 0))
        make_face()
    extrude(amount=F6_T71_DEPTH, mode=Mode.SUBTRACT)

    # F6_s74 → F6_t73 (cut)
    with BuildSketch(Plane.YZ.offset(-36.83)):
        with BuildLine():
            ThreePointArc((-19.05, 8.255), (-18.6780256121, 9.1530256121), (-17.78, 9.525))
            Line((-17.78, 9.525), (-19.05, 9.525))
            Line((-19.05, 9.525), (-19.05, 8.255))
        make_face()
        with BuildLine():
            ThreePointArc((0, 8.255), (-0.3719743879, 9.1530256121), (-1.27, 9.525))
            Line((-1.27, 9.525), (0, 9.525))
            Line((0, 9.525), (0, 8.255))
        make_face()
    extrude(amount=F6_T73_DEPTH, mode=Mode.SUBTRACT)


with BuildPart() as f6_tool76:
    # F6_s77 → F6_t78 (new body)
    with BuildSketch(Plane.XZ.offset(1.27)):
        with Locations((-38.735, 18.415)):
            Rectangle(F6_S77_W, F6_S77_H)
    extrude(amount=-F6_T78_DEPTH)

    # F6_s79 → F6_t80 (revolve, cut)
    with BuildSketch(Plane(origin=(-39.37, -1.27, 17.78), x_dir=(-0.7071067812, 0, -0.7071067812), z_dir=(0.7071067812, 0, -0.7071067812))):
        with BuildLine():
            ThreePointArc((0, -1.27), (1.27, 0), (0, 1.27))
            Line((0, 1.27), (0, -1.27))
        make_face()
    revolve(axis=Axis((-39.37, -1.27, 17.78), (0, 1, 0)), mode=Mode.SUBTRACT)


with BuildPart() as f1_9:
    add(f1_8.part)

    # F6_t75: cut F6_tool76
    add(f6_tool76.part, mode=Mode.SUBTRACT)


with BuildPart() as f6_tool82:
    # F6_s83 → F6_t84 (new body)
    with BuildSketch(Plane.XZ.offset(1.27)):
        with Locations((38.735, 18.415)):
            Rectangle(F6_S83_W, F6_S83_H)
    extrude(amount=-F6_T84_DEPTH)

    # F6_s85 → F6_t86 (revolve, cut)
    with BuildSketch(Plane(origin=(39.37, -1.27, 17.78), x_dir=(0.7071067812, 0, -0.7071067812), z_dir=(0.7071067812, 0, 0.7071067812))):
        with BuildLine():
            ThreePointArc((0, -1.27), (1.27, 0), (0, 1.27))
            Line((0, 1.27), (0, -1.27))
        make_face()
    revolve(axis=Axis((39.37, -1.27, 17.78), (0, 1, 0)), mode=Mode.SUBTRACT)


with BuildPart() as f1_10:
    add(f1_9.part)

    # F6_t81: cut F6_tool82
    add(f6_tool82.part, mode=Mode.SUBTRACT)


with BuildPart() as f6_tool88:
    # F6_s89 → F6_t90 (new body)
    with BuildSketch(Plane.XZ.offset(17.78)):
        with Locations((-38.735, 18.415)):
            Rectangle(F6_S89_W, F6_S89_H)
    extrude(amount=F6_T90_DEPTH)

    # F6_s91 → F6_t92 (revolve, cut)
    with BuildSketch(Plane(origin=(-39.37, -17.78, 17.78), x_dir=(-0.7071067812, 0, -0.7071067812), z_dir=(-0.7071067812, 0, 0.7071067812))):
        with BuildLine():
            ThreePointArc((0, -1.27), (1.27, 0), (0, 1.27))
            Line((0, 1.27), (0, -1.27))
        make_face()
    revolve(axis=Axis((-39.37, -17.78, 17.78), (0, -1, 0)), mode=Mode.SUBTRACT)


with BuildPart() as f1_11:
    add(f1_10.part)

    # F6_t87: cut F6_tool88
    add(f6_tool88.part, mode=Mode.SUBTRACT)


with BuildPart() as f6_tool94:
    # F6_s95 → F6_t96 (new body)
    with BuildSketch(Plane.XZ.offset(17.78)):
        with Locations((38.735, 18.415)):
            Rectangle(F6_S95_W, F6_S95_H)
    extrude(amount=F6_T96_DEPTH)

    # F6_s97 → F6_t98 (revolve, cut)
    with BuildSketch(Plane(origin=(39.37, -17.78, 17.78), x_dir=(0.7071067812, 0, -0.7071067812), z_dir=(-0.7071067812, 0, -0.7071067812))):
        with BuildLine():
            ThreePointArc((0, -1.27), (1.27, 0), (0, 1.27))
            Line((0, 1.27), (0, -1.27))
        make_face()
    revolve(axis=Axis((39.37, -17.78, 17.78), (0, -1, 0)), mode=Mode.SUBTRACT)


with BuildPart() as f1_12:
    add(f1_11.part)

    # F6_t93: cut F6_tool94
    add(f6_tool94.part, mode=Mode.SUBTRACT)

    # F6_s99 → F6_t100 (revolve, cut)
    with BuildSketch(Plane.XY.offset(10.795)):
        with BuildLine():
            ThreePointArc((-39.37, 0), (-38.4719743879, -0.3719743879), (-38.1, -1.27))
            Line((-38.1, -1.27), (-38.1, 0))
            Line((-38.1, 0), (-39.37, 0))
        make_face()
    revolve(axis=Axis((-36.83, 0, 10.795), (0, -1, 0)), revolution_arc=F6_T100_ANGLE, mode=Mode.SUBTRACT)

    # F6_s101 → F6_t102 (revolve, cut)
    with BuildSketch(Plane.XY.offset(10.795)):
        with BuildLine():
            ThreePointArc((39.37, 0), (38.4719743879, -0.3719743879), (38.1, -1.27))
            Line((38.1, -1.27), (38.1, 0))
            Line((38.1, 0), (39.37, 0))
        make_face()
    revolve(axis=Axis((36.83, 0, 10.795), (0, 1, 0)), revolution_arc=F6_T102_ANGLE, mode=Mode.SUBTRACT)

    # F6_s103 → F6_t104 (revolve, cut)
    with BuildSketch(Plane.XY.offset(10.795)):
        with BuildLine():
            ThreePointArc((-39.37, -19.05), (-38.4719743879, -18.6780256121), (-38.1, -17.78))
            Line((-38.1, -17.78), (-38.1, -19.05))
            Line((-38.1, -19.05), (-39.37, -19.05))
        make_face()
    revolve(axis=Axis((-36.83, -19.05, 10.795), (0, -1, 0)), revolution_arc=F6_T104_ANGLE, mode=Mode.SUBTRACT)

    # F6_s105 → F6_t106 (revolve, cut)
    with BuildSketch(Plane.XY.offset(10.795)):
        with BuildLine():
            ThreePointArc((39.37, -19.05), (38.4719743879, -18.6780256121), (38.1, -17.78))
            Line((38.1, -17.78), (38.1, -19.05))
            Line((38.1, -19.05), (39.37, -19.05))
        make_face()
    revolve(axis=Axis((36.83, -19.05, 10.795), (0, 1, 0)), revolution_arc=F6_T106_ANGLE, mode=Mode.SUBTRACT)


solid = f1_12.part
